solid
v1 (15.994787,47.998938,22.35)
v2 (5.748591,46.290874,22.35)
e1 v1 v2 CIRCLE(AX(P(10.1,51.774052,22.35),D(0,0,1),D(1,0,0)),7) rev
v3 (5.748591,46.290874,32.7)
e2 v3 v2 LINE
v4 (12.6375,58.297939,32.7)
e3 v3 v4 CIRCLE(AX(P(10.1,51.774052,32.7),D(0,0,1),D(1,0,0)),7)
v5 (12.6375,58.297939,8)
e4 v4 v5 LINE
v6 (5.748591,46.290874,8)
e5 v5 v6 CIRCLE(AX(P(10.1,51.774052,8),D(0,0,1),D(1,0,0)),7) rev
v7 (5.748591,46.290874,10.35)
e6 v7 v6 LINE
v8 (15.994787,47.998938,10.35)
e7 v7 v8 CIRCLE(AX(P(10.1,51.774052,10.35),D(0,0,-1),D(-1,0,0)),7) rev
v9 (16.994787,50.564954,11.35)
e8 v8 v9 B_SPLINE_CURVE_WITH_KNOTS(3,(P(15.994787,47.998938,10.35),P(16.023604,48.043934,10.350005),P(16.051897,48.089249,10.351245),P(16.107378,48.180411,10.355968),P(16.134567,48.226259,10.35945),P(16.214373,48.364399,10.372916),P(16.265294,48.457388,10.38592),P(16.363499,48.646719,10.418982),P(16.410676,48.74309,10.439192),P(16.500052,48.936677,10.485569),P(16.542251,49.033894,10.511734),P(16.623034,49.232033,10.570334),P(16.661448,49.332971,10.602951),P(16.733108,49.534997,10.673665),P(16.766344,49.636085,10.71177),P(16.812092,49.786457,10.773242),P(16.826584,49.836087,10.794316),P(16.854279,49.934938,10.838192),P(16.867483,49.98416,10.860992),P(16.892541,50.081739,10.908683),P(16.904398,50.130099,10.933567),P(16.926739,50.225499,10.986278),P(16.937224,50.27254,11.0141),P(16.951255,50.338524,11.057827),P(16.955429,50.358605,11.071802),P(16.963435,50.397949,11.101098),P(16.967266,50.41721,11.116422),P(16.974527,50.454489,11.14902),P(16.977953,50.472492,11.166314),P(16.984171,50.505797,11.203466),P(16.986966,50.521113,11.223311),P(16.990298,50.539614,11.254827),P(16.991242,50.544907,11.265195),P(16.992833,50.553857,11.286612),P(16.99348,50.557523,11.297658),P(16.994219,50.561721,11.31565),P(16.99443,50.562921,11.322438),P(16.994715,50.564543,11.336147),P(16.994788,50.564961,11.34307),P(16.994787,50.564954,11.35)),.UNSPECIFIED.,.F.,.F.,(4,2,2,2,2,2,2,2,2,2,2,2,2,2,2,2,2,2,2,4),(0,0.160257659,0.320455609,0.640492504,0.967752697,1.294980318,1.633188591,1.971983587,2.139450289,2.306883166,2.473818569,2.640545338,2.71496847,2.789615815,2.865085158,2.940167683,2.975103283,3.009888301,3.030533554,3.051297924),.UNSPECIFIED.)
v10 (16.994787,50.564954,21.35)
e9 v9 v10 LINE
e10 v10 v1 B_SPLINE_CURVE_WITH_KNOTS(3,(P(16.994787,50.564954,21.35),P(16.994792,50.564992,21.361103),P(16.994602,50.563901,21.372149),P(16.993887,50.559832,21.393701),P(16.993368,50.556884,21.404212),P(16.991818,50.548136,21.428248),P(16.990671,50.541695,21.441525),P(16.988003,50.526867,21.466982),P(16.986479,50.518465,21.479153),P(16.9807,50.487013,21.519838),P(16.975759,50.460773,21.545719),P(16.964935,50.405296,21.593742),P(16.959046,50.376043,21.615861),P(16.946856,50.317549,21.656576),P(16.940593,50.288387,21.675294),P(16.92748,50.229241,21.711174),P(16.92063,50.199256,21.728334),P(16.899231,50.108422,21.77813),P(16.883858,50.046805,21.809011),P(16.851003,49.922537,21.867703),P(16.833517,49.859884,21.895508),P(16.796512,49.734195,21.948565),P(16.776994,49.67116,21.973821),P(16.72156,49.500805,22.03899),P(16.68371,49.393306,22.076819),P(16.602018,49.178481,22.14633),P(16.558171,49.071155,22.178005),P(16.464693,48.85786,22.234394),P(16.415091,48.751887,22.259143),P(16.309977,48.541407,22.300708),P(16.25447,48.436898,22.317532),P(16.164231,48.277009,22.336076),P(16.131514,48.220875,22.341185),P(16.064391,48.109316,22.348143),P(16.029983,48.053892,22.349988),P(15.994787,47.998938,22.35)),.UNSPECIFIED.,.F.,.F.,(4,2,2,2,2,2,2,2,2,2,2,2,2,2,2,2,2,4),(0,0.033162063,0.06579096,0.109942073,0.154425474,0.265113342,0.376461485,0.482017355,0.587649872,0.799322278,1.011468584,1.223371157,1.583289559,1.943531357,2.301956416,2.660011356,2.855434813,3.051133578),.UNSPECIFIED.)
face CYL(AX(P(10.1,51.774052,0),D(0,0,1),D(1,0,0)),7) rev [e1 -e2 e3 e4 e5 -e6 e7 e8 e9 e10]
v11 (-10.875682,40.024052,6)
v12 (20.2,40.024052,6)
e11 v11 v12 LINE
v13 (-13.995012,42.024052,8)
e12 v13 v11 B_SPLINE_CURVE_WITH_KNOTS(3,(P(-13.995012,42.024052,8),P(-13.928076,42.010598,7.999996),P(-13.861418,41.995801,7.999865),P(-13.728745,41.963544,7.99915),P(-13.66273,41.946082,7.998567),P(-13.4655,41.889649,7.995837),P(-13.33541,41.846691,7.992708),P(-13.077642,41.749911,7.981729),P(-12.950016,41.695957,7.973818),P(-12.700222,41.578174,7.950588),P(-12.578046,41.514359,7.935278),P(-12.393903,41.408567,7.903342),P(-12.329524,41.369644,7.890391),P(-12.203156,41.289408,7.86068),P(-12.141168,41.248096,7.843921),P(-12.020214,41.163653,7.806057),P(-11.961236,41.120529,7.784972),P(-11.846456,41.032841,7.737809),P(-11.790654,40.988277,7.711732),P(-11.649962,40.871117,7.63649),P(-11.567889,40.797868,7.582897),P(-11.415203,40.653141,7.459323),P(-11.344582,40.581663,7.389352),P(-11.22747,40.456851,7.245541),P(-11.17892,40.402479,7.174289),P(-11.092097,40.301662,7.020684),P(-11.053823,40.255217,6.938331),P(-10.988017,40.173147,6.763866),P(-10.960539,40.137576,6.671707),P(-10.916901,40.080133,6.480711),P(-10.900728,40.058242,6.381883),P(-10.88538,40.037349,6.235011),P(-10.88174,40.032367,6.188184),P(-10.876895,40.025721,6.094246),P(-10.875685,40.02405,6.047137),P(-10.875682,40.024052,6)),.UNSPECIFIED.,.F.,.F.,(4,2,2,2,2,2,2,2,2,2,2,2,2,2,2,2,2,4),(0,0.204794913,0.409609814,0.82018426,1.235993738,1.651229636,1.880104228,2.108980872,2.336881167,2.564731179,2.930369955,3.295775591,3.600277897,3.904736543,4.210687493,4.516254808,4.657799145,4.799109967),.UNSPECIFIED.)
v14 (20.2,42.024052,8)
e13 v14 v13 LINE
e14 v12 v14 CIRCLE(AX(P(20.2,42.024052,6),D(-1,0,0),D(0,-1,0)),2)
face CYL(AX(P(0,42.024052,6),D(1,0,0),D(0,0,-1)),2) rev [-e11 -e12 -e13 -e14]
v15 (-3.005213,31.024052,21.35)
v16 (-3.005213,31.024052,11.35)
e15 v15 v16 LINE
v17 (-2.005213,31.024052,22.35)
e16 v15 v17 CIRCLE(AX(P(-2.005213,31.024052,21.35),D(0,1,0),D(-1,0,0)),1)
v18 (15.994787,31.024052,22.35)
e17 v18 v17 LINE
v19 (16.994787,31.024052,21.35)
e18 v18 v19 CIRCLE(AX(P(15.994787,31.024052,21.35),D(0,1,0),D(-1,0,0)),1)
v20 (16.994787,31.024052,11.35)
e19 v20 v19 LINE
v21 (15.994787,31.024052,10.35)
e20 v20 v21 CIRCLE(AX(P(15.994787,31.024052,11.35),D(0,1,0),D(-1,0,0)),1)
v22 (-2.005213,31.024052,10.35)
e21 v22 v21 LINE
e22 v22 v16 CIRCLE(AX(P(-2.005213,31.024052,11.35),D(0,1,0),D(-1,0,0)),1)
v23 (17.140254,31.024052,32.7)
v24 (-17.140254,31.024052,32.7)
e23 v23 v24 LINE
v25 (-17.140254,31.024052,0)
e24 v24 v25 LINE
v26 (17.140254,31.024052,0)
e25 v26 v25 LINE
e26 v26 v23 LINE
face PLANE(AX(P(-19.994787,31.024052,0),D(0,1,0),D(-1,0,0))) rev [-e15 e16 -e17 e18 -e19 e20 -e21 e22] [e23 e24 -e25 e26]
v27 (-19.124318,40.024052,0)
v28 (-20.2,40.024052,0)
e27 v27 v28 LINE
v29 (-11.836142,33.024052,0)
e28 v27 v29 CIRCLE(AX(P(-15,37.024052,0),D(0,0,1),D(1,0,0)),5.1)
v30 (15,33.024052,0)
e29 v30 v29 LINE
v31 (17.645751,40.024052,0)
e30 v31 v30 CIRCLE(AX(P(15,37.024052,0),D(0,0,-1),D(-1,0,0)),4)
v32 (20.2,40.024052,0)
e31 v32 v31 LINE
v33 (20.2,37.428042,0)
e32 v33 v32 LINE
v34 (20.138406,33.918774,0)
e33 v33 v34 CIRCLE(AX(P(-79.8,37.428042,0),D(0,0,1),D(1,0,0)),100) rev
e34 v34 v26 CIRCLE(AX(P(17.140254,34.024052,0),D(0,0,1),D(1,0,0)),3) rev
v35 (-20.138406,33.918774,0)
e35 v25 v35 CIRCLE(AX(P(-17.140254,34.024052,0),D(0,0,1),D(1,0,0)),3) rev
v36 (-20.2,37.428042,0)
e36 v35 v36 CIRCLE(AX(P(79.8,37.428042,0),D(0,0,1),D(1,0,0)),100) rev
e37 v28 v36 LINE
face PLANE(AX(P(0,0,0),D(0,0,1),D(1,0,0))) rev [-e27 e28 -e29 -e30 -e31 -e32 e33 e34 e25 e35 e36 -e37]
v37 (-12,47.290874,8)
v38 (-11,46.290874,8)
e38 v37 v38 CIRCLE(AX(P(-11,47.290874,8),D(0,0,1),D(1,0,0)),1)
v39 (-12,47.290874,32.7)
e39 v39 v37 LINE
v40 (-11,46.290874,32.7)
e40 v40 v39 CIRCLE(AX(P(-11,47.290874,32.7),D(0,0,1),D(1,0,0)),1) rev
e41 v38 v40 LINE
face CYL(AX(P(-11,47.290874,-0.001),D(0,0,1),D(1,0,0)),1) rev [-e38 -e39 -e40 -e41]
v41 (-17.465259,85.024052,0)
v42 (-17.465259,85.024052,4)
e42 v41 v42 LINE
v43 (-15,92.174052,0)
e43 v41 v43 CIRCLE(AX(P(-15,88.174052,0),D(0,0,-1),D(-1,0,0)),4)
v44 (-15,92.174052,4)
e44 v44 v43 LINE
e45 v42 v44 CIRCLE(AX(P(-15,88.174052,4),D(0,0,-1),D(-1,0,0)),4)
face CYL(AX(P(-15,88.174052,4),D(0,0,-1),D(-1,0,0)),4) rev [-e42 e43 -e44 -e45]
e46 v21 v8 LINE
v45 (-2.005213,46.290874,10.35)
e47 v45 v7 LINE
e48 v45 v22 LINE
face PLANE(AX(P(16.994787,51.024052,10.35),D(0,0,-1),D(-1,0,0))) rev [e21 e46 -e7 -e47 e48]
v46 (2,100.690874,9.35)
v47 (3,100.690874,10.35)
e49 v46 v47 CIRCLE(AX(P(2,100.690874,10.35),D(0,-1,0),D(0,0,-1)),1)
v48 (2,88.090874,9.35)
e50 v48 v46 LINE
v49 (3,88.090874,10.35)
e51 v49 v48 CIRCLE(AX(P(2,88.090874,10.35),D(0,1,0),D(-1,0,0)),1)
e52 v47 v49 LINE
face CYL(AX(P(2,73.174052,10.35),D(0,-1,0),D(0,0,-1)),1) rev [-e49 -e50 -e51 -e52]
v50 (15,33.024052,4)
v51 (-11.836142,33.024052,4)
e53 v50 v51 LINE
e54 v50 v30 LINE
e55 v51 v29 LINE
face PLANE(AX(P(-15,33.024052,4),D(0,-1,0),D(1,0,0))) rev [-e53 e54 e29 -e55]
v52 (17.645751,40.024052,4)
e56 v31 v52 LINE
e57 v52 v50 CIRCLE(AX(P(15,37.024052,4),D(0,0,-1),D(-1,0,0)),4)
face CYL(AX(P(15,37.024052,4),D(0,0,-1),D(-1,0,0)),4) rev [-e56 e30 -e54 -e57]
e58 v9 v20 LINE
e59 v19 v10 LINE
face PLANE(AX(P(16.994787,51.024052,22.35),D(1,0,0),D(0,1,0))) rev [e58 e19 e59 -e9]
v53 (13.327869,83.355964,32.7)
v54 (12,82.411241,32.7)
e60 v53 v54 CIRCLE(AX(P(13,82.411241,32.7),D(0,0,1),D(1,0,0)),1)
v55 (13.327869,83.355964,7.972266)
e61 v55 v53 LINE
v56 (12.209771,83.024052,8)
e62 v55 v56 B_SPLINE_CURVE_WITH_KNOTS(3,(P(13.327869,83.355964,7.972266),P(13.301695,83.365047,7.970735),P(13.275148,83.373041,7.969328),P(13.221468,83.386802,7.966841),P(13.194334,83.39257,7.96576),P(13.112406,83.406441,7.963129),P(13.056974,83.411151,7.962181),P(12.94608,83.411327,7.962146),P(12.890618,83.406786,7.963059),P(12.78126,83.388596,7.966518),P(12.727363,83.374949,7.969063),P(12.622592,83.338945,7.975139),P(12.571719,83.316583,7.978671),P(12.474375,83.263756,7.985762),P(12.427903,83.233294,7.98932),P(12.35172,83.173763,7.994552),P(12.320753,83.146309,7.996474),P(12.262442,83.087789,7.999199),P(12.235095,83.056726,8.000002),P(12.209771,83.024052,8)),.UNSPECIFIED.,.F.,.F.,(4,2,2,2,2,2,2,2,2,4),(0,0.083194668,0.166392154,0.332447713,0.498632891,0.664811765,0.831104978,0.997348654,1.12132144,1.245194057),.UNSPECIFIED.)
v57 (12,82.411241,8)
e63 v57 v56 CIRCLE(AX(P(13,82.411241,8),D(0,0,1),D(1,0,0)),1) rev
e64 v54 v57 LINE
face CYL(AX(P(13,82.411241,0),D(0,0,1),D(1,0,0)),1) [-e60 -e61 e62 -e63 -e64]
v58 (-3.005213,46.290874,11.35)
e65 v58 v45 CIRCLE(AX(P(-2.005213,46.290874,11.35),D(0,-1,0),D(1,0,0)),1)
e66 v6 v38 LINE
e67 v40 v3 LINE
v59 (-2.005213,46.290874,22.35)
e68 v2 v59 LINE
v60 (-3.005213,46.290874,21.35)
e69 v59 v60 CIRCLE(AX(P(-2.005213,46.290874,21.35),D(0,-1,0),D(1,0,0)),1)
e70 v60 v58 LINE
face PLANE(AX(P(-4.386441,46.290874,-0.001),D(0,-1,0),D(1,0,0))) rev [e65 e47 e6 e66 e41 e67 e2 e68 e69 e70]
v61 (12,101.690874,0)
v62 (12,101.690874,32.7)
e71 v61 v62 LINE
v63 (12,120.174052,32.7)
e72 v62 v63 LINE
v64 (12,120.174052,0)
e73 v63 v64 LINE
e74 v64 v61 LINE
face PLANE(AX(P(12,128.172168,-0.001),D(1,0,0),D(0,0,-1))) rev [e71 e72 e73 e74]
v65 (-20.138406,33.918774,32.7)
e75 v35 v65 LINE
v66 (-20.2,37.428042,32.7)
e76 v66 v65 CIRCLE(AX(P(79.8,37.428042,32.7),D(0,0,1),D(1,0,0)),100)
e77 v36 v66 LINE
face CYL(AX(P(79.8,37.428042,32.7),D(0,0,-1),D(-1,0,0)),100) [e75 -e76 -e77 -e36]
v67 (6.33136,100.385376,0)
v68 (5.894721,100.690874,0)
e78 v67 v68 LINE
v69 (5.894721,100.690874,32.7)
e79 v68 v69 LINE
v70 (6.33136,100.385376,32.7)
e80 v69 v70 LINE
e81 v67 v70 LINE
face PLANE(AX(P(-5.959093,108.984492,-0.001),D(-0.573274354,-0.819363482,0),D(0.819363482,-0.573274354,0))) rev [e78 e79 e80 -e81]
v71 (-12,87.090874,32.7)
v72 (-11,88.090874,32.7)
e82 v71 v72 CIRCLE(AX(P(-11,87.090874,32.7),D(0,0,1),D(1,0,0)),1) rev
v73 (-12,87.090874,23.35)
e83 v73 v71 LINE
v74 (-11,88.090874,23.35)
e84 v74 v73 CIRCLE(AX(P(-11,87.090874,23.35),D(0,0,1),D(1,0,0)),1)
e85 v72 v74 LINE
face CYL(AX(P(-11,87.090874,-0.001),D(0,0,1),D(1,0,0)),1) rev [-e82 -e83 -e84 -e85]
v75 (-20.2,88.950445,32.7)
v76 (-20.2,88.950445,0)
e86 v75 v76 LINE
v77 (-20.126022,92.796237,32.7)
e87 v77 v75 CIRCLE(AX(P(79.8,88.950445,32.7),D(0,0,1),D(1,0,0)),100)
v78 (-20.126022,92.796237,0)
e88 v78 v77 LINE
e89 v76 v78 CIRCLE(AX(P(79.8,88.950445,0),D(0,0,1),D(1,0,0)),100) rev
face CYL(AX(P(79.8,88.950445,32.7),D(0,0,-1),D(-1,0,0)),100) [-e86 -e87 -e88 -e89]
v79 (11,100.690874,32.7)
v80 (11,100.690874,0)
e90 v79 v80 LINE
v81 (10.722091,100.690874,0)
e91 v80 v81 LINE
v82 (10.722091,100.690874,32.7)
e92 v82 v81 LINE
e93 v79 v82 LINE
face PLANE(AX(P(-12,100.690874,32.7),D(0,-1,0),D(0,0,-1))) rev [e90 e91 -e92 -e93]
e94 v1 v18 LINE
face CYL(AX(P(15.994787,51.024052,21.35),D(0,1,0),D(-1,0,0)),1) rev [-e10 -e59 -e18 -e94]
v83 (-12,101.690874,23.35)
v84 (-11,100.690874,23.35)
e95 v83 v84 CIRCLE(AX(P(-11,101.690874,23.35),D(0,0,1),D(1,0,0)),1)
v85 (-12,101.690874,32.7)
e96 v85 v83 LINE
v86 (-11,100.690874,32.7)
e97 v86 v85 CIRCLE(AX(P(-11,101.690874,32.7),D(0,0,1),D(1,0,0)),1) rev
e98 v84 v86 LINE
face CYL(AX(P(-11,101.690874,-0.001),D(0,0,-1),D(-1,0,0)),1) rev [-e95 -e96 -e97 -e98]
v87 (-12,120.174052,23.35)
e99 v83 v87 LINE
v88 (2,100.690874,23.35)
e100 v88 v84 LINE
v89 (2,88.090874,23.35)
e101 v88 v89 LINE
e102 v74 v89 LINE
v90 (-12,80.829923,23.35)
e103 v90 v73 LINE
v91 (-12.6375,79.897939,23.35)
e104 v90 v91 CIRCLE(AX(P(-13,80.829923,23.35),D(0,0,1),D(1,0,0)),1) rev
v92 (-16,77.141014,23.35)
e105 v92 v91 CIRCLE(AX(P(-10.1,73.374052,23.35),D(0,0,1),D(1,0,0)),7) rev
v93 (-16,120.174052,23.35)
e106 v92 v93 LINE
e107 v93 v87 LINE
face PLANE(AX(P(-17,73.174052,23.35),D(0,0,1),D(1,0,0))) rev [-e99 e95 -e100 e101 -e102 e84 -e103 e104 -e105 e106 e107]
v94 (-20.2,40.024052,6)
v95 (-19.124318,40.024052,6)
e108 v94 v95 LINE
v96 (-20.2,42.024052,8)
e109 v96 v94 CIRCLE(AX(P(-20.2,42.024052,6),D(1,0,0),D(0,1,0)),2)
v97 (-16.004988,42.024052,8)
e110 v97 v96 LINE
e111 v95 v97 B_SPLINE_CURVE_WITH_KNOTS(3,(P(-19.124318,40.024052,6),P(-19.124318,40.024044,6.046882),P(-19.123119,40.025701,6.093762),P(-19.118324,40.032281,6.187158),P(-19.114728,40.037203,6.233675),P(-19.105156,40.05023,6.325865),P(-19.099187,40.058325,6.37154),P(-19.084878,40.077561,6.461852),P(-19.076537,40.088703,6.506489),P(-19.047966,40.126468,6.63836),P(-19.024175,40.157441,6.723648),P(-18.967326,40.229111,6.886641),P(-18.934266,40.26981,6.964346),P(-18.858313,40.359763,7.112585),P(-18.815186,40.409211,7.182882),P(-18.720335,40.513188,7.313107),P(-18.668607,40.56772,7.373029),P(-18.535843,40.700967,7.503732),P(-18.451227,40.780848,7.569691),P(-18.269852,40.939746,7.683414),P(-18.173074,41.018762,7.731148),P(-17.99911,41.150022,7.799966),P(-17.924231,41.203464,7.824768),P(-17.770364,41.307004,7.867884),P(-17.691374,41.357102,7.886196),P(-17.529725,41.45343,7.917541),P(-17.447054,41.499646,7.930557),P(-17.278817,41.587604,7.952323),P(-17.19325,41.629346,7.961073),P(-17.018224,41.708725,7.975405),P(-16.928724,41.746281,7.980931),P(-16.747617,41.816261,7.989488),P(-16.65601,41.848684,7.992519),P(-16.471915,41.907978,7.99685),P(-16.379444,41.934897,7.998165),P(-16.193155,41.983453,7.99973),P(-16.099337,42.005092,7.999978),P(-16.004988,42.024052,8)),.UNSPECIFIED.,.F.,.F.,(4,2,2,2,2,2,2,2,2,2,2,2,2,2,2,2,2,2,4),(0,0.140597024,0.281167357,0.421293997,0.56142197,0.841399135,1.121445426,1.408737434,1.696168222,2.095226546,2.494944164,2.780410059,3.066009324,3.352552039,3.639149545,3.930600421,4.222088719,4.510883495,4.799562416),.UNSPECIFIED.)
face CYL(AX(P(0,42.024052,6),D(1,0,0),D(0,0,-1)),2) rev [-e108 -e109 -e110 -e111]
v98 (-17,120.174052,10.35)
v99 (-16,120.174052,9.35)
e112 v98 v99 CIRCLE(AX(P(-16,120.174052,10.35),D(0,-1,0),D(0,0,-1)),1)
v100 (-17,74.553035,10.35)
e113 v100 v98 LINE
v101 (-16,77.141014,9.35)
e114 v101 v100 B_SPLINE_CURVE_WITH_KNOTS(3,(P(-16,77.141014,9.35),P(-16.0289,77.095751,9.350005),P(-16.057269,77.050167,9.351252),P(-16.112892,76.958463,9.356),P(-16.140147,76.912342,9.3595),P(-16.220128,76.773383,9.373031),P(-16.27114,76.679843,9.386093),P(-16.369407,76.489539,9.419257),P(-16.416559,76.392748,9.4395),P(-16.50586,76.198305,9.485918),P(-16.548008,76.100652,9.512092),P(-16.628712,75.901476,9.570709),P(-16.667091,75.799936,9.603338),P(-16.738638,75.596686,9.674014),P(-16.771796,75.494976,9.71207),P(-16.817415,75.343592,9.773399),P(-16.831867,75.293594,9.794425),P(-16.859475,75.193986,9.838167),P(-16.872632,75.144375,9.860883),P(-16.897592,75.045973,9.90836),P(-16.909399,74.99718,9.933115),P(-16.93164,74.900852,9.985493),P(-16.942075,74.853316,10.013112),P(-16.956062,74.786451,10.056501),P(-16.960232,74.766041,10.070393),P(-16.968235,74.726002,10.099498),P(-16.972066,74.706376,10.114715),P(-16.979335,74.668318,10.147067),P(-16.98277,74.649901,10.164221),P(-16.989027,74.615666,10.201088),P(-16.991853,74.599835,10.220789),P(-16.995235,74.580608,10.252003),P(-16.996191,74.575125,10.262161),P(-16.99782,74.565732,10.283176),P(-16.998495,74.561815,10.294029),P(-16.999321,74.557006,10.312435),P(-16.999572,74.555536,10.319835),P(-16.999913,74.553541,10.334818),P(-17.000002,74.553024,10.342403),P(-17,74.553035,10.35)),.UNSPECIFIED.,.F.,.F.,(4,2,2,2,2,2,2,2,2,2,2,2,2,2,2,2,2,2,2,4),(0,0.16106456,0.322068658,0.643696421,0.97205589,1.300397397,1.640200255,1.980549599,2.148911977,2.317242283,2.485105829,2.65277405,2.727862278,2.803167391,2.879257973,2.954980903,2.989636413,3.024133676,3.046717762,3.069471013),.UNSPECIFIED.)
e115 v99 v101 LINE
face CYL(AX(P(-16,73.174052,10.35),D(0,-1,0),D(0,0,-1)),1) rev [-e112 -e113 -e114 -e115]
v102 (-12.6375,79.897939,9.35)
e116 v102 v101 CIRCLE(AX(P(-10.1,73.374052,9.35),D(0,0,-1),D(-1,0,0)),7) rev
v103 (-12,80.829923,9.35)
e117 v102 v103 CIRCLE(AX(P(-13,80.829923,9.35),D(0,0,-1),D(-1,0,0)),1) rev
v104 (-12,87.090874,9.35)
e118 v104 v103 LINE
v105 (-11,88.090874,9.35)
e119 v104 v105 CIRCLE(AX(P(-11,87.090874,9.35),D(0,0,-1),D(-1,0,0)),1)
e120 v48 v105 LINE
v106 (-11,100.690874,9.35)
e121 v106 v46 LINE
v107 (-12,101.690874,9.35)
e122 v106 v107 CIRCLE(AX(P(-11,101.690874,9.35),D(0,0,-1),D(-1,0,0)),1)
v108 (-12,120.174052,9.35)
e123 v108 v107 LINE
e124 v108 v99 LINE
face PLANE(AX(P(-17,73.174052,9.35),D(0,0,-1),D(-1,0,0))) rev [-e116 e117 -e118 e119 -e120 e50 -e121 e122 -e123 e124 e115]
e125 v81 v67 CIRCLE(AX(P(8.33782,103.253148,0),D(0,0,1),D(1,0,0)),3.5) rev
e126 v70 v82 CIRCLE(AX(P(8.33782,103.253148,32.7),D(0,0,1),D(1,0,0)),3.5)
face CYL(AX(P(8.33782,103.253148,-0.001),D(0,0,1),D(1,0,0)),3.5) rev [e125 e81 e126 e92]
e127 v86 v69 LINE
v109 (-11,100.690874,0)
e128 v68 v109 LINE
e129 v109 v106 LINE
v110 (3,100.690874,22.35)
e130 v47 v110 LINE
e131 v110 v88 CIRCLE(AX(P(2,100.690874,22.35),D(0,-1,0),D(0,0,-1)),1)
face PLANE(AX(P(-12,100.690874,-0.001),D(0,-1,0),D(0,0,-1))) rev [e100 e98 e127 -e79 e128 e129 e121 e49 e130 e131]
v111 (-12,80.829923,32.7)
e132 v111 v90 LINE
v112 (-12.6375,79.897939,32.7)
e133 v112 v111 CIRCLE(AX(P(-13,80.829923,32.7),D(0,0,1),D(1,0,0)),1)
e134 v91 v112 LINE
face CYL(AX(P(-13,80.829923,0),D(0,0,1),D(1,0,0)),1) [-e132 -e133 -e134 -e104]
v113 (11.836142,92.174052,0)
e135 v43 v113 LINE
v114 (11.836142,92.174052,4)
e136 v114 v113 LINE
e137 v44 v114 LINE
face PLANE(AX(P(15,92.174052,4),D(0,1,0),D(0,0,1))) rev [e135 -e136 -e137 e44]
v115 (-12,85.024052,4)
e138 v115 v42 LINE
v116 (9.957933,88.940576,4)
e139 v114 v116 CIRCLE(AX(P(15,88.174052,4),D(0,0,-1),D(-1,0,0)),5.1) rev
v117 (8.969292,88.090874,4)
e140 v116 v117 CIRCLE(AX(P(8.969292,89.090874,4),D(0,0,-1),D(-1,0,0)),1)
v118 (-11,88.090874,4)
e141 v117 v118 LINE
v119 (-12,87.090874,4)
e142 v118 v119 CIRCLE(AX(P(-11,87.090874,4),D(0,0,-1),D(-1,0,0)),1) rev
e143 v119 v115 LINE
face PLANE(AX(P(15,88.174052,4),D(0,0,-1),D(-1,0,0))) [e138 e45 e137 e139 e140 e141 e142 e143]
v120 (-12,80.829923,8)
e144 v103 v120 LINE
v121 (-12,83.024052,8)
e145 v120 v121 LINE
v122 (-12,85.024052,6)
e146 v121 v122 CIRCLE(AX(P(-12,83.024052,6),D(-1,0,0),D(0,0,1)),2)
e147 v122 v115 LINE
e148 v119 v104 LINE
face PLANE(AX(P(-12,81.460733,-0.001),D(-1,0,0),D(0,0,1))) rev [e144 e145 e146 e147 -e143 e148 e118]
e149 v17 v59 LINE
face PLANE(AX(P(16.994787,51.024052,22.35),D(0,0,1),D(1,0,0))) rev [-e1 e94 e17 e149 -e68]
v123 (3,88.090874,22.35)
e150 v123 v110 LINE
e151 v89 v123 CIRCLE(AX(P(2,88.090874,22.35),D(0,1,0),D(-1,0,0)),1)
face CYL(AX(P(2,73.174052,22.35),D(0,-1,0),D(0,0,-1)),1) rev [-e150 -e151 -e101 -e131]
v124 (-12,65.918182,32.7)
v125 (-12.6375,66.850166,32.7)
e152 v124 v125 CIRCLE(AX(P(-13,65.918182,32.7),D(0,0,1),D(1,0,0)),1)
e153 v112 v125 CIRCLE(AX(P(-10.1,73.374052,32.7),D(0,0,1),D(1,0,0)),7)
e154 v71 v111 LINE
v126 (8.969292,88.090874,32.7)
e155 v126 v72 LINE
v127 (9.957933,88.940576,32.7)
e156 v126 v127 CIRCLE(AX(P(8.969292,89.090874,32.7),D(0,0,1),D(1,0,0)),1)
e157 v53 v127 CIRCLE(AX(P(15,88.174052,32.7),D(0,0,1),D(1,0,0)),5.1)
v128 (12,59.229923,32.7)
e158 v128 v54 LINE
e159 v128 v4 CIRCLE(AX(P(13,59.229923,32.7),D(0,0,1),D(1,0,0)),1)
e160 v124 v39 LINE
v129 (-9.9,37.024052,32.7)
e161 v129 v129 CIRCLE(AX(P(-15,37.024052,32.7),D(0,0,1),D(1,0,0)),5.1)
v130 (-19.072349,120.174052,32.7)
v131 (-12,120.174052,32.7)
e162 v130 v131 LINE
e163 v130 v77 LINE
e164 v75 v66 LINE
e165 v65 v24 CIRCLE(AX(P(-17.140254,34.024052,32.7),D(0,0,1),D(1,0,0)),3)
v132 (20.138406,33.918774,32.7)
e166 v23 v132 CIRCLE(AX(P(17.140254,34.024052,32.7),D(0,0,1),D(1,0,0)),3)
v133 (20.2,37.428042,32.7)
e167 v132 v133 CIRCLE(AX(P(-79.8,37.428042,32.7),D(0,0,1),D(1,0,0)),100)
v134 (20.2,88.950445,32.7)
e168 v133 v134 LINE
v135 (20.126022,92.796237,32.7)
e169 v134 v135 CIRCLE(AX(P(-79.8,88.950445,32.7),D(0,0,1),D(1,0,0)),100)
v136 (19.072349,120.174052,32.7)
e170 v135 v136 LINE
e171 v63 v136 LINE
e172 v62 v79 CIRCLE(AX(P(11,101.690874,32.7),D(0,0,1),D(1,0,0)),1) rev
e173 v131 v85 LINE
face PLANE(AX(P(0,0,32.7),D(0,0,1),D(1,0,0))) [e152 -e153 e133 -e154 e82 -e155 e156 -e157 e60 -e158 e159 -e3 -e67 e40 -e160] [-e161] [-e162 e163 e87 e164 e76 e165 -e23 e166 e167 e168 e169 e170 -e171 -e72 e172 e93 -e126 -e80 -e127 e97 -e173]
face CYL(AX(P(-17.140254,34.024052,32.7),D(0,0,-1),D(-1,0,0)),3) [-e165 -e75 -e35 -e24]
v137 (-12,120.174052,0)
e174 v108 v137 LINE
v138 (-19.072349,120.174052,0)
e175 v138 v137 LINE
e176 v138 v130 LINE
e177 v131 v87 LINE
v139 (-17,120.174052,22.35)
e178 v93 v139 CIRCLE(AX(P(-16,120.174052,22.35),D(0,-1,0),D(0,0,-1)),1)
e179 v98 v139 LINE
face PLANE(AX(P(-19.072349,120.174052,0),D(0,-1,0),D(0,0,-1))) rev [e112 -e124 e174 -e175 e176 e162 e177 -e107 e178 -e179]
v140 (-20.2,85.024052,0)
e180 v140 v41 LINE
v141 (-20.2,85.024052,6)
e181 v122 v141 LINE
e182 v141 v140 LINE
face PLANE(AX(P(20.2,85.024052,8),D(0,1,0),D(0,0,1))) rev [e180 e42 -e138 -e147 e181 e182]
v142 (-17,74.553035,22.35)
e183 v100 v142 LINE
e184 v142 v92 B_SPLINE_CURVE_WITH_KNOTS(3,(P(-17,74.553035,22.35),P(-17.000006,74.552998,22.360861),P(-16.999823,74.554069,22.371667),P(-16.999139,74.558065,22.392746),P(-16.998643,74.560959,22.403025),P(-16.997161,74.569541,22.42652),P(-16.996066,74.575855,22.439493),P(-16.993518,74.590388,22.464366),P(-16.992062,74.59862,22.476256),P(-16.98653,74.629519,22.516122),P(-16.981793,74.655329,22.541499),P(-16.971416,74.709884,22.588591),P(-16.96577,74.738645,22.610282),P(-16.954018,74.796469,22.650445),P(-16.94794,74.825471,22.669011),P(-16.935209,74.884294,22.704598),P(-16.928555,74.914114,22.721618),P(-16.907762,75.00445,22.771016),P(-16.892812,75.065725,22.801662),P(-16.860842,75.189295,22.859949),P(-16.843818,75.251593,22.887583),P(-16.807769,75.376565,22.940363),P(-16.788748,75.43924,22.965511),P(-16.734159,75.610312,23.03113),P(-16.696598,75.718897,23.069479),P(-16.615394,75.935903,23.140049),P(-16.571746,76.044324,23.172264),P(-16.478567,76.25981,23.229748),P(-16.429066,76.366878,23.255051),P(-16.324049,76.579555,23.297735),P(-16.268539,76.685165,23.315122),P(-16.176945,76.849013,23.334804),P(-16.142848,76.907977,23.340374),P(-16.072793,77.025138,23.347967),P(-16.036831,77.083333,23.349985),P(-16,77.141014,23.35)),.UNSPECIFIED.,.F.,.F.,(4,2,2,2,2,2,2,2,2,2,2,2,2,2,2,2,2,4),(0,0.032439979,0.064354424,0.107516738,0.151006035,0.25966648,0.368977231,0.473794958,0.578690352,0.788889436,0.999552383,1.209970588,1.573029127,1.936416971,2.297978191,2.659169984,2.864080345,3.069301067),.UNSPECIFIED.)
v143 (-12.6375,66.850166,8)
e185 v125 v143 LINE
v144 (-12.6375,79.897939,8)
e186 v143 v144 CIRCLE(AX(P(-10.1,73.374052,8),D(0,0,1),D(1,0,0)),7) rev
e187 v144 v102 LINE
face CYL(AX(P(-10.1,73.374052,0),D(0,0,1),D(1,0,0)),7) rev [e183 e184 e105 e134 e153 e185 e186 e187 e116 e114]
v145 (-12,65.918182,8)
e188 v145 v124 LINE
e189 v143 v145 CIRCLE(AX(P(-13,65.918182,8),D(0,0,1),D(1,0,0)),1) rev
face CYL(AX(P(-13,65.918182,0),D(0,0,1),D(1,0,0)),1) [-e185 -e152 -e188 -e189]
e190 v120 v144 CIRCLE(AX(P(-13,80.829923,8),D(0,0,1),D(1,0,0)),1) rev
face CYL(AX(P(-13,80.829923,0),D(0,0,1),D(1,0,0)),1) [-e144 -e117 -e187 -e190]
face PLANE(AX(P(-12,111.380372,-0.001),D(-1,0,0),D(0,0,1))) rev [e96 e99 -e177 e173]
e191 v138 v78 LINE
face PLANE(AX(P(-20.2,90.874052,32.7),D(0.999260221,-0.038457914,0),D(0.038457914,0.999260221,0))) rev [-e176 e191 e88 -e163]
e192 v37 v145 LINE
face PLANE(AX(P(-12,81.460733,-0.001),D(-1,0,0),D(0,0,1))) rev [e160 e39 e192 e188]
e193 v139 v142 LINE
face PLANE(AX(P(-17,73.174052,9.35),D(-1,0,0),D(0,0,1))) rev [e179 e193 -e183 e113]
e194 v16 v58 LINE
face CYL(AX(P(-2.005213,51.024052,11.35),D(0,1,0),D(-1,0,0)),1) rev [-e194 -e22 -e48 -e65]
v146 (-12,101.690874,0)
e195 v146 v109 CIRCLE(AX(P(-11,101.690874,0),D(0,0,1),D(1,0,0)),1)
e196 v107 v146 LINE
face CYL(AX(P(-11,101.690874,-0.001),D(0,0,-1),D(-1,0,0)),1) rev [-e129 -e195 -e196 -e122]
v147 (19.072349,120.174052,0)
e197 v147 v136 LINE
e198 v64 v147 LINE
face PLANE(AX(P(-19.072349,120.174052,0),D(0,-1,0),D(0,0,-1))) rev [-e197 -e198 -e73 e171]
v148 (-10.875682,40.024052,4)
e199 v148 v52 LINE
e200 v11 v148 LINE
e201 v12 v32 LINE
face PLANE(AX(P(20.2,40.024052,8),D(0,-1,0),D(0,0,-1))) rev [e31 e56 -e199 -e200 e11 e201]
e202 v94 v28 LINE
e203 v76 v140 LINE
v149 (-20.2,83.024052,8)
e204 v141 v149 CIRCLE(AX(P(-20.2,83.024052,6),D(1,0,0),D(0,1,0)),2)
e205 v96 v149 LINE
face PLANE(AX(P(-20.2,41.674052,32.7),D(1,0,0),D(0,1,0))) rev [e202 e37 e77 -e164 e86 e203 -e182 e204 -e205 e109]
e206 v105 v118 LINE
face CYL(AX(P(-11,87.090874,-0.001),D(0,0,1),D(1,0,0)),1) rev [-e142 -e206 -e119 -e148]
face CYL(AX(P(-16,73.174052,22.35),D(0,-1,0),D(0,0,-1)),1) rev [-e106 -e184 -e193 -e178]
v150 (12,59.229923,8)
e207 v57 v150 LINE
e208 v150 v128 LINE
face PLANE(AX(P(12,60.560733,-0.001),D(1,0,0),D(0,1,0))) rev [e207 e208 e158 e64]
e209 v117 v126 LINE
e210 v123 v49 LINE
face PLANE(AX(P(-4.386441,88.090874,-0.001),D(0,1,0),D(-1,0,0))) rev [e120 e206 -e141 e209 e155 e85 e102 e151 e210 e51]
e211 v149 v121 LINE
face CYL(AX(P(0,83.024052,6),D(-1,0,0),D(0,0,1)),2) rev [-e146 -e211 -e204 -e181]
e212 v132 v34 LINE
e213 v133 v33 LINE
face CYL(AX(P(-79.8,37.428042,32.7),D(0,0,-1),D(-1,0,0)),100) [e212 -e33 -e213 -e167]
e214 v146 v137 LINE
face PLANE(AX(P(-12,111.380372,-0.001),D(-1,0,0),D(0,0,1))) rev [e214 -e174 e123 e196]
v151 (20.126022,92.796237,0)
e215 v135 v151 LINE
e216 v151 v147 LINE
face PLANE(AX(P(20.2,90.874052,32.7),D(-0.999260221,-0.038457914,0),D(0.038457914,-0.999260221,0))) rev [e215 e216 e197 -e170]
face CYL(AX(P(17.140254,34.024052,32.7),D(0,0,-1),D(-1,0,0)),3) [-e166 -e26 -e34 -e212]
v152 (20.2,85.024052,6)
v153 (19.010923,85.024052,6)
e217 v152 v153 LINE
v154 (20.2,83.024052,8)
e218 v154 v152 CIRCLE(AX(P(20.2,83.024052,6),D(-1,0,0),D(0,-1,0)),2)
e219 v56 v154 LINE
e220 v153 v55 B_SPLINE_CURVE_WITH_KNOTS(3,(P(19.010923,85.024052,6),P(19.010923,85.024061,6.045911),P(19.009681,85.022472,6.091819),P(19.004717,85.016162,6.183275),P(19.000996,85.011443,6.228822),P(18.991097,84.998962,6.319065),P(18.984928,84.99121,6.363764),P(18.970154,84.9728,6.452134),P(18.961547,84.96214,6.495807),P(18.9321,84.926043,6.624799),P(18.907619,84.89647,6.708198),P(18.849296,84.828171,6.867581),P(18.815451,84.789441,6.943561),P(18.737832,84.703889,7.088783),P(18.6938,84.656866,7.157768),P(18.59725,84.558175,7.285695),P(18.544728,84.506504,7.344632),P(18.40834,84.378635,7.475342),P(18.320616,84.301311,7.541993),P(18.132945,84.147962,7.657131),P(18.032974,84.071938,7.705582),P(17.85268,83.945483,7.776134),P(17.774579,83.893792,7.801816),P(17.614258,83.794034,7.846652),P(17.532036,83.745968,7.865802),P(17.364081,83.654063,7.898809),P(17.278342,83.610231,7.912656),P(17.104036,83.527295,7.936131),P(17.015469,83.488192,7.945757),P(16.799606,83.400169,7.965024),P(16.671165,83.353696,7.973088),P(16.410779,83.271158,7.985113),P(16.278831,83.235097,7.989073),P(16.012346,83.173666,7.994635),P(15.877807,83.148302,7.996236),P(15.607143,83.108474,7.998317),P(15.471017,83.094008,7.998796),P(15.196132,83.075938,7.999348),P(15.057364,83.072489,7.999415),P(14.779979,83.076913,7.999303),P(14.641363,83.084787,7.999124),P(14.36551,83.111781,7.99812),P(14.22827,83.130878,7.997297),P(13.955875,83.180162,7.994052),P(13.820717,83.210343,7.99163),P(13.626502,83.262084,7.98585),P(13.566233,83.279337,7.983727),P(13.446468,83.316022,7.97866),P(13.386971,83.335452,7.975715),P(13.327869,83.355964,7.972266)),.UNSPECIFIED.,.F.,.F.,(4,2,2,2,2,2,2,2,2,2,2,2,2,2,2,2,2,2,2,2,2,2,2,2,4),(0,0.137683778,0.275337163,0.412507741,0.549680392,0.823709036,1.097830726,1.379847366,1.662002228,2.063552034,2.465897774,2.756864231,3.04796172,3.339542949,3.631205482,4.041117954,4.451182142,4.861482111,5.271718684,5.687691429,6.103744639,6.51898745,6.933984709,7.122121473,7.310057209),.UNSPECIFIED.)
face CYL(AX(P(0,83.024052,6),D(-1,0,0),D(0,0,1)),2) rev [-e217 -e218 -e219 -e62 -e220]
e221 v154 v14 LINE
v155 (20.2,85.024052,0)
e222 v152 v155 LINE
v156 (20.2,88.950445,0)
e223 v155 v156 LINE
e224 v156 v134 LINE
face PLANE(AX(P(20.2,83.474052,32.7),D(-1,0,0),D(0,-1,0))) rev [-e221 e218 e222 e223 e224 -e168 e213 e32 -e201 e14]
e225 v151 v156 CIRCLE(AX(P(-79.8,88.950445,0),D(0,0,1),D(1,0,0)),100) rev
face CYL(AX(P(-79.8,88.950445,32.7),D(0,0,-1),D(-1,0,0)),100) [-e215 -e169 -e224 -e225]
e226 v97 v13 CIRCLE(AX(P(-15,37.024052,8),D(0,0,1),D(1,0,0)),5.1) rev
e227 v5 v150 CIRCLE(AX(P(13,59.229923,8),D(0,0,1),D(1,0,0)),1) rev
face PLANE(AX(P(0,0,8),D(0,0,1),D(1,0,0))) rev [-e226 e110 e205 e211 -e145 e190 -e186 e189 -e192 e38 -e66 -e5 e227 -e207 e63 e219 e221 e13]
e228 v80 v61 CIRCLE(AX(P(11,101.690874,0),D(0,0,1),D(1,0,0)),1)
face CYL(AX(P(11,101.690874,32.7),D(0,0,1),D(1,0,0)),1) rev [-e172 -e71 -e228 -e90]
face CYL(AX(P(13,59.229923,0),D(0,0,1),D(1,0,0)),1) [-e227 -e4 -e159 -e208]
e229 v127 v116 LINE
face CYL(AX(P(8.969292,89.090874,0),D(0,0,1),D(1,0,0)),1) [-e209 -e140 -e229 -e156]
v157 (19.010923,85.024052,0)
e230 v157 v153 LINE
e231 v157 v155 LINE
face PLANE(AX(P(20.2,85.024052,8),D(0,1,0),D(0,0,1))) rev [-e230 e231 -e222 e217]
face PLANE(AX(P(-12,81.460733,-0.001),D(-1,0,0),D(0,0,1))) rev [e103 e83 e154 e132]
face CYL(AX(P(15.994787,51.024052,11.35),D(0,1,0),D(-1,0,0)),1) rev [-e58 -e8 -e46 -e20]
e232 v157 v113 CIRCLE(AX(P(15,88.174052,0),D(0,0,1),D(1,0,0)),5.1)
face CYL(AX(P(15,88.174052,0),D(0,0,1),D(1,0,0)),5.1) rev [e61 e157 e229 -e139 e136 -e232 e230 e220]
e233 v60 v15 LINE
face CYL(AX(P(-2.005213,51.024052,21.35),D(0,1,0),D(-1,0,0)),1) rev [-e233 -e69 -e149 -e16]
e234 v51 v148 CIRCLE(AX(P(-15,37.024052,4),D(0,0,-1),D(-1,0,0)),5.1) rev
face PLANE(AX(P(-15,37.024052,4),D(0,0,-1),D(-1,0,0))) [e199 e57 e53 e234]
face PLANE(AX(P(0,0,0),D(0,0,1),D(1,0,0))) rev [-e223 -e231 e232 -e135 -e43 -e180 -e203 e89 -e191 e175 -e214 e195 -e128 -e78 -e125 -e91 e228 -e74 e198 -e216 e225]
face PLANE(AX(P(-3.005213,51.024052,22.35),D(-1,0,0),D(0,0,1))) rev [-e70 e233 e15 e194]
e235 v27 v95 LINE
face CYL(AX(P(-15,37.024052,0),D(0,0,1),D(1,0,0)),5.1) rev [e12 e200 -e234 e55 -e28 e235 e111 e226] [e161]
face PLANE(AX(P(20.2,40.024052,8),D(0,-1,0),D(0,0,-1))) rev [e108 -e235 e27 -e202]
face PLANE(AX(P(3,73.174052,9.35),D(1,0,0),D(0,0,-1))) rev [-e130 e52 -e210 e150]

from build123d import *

# Parameters (mm, degrees)
SKETCH1_R               = 7.95
SKETCH1_R_2             = 3
MAIN_BODY_LINK_B1_DEPTH = 32.7
CUT_EXTRUDE2_REACH      = 172.091
CUT_EXTRUDE3_REACH      = 172.091
SKETCH5_R               = 1.5
PULLEYIDLERUP_DEPTH     = 32.7
CUT_EXTRUDE5_DEPTH      = 32.7
FILLET5_R               = 100
SKETCH8_R               = 15.25
CUT_EXTRUDE6_DEPTH      = 171.090551712
SKETCH9_R               = 5.1
SKETCH9_W               = 38.1446978
SKETCH9_H               = 45.516821784
SKETCH9_W_2             = 39.989573096
SKETCH9_H_2             = 49.024052381
CUT_EXTRUDE7_DEPTH      = 171.090551712
SKETCH10_W              = 24
SKETCH10_H              = 41.8
SKETCH10_H_2            = 19.483178216
CUT_EXTRUDE8_DEPTH      = 127.171046068
SKETCH12_R              = 7
CUT_EXTRUDE13_DEPTH     = 127.171046068
SKETCH16_W              = 40.4
SKETCH16_H              = 45
CUT_EXTRUDE18_DEPTH     = 8
SKETCH18_W              = 20
SKETCH18_H              = 14
CUT_EXTRUDE19_DEPTH     = 47
SKETCH19_W              = 20
SKETCH19_H              = 12
CUT_EXTRUDE20_DEPTH     = 20
CUT_EXTRUDE21_DEPTH     = 4
FILLET6_R               = 3
FILLET7_R               = 1
FILLET8_R               = 1
FILLET9_R               = 2


with BuildPart() as part:
    # Sketch1 → Main Body Link B1 (new body)
    with BuildSketch(Plane.XY):
        with BuildLine():
            Line((20.2, 41.674052381), (20.2, 83.474052381))
            Line((20.2, 83.474052381), (20.2, 90.874052381))
            Line((20.2, 90.874052381), (17.986683974, 148.383116621))
            ThreePointArc((17.986683974, 148.383116621), (0, 165.690874165), (-17.986683974, 148.383116621))
            Line((-17.986683974, 148.383116621), (-20.2, 90.874052381))
            Line((-20.2, 90.874052381), (-20.2, 83.474052381))
            Line((-20.2, 83.474052381), (-20.2, 41.674052381))
            Line((-20.2, 41.674052381), (-20.2, 34.274052381))
            Line((-20.2, 34.274052381), (-17.964224051, -1.134307826))
            ThreePointArc((-17.964224051, -1.134307826), (0, -18), (17.964224051, -1.134307826))
            Line((17.964224051, -1.134307826), (20.2, 34.274052381))
            Line((20.2, 34.274052381), (20.2, 41.674052381))
        make_face()
        Circle(SKETCH1_R, mode=Mode.SUBTRACT)
        with Locations((15, 88.174052381)):
            Circle(SKETCH1_R_2, mode=Mode.SUBTRACT)
        with Locations((-15, 37.024052381)):
            Circle(SKETCH1_R_2, mode=Mode.SUBTRACT)
        with Locations((0, 147.690874165)):
            Circle(SKETCH1_R, mode=Mode.SUBTRACT)
    extrude(amount=MAIN_BODY_LINK_B1_DEPTH)

    # Sketch4 → Cut-Extrude2 (cut, up to next)
    with BuildSketch(Plane.XY.offset(32.7), mode=Mode.PRIVATE) as cut_extrude2_sk1:
        with BuildLine():
            Line((-12, 134.2744663), (-12, 123.584968066))
            Line((-12, 123.584968066), (-2.929911079, 129.930929878))
            ThreePointArc((-2.929911079, 129.930929878), (-7.774454217, 131.456408925), (-12, 134.2744663))
        make_face()
    cut_extrude2_tool1 = extrude(cut_extrude2_sk1.sketch, amount=-CUT_EXTRUDE2_REACH, mode=Mode.PRIVATE) & part.part
    # Sketch4 → Cut-Extrude2 (cut, up to next)
    with BuildSketch(Plane.XY.offset(32.7), mode=Mode.PRIVATE) as cut_extrude2_sk2:
        Polygon((-12, 100.690874165), (3.278172542, 100.690874165), (-12, 111.380372399), align=None)
    cut_extrude2_tool2 = extrude(cut_extrude2_sk2.sketch, amount=-CUT_EXTRUDE2_REACH, mode=Mode.PRIVATE) & part.part
    # Sketch4 → Cut-Extrude2 (cut, up to next)
    with BuildSketch(Plane.XY.offset(32.7), mode=Mode.PRIVATE) as cut_extrude2_sk3:
        Polygon((12, 128.172168466), (12, 106.793171999), (-3.278172542, 117.482670232), align=None)
    cut_extrude2_tool3 = extrude(cut_extrude2_sk3.sketch, amount=-CUT_EXTRUDE2_REACH, mode=Mode.PRIVATE) & part.part
    # Sketch4 → Cut-Extrude2 (cut, up to next)
    with BuildSketch(Plane.XY.offset(32.7), mode=Mode.PRIVATE) as cut_extrude2_sk4:
        Polygon((-4.386441158, 88.090874165), (12, 88.090874165), (12, 73.82101499), align=None)
    cut_extrude2_tool4 = extrude(cut_extrude2_sk4.sketch, amount=-CUT_EXTRUDE2_REACH, mode=Mode.PRIVATE) & part.part
    # Sketch4 → Cut-Extrude2 (cut, up to next)
    with BuildSketch(Plane.XY.offset(32.7), mode=Mode.PRIVATE) as cut_extrude2_sk5:
        Polygon((-12, 81.46073334), (-12, 52.92101499), (4.386441158, 67.190874165), align=None)
    cut_extrude2_tool5 = extrude(cut_extrude2_sk5.sketch, amount=-CUT_EXTRUDE2_REACH, mode=Mode.PRIVATE) & part.part
    # Sketch4 → Cut-Extrude2 (cut, up to next)
    with BuildSketch(Plane.XY.offset(32.7), mode=Mode.PRIVATE) as cut_extrude2_sk6:
        Polygon((-4.386441158, 46.290874165), (12, 46.290874165), (12, 60.56073334), align=None)
    cut_extrude2_tool6 = extrude(cut_extrude2_sk6.sketch, amount=-CUT_EXTRUDE2_REACH, mode=Mode.PRIVATE) & part.part
    add(cut_extrude2_tool1.solids().sort_by_distance((-9.12997, 128.978342, 32.7))[0], mode=Mode.SUBTRACT)
    add(cut_extrude2_tool2.solids().sort_by_distance((-6.907276, 104.25404, 32.7))[0], mode=Mode.SUBTRACT)
    add(cut_extrude2_tool3.solids().sort_by_distance((6.907276, 117.48267, 32.7))[0], mode=Mode.SUBTRACT)
    add(cut_extrude2_tool4.solids().sort_by_distance((6.537853, 83.334254, 32.7))[0], mode=Mode.SUBTRACT)
    add(cut_extrude2_tool5.solids().sort_by_distance((-6.537853, 67.190874, 32.7))[0], mode=Mode.SUBTRACT)
    add(cut_extrude2_tool6.solids().sort_by_distance((6.537853, 51.047494, 32.7))[0], mode=Mode.SUBTRACT)

    # Sketch5 → Cut-Extrude3 (cut, up to next)
    with BuildSketch(Plane.XY.offset(32.7), mode=Mode.PRIVATE) as cut_extrude3_sk1:
        with Locations((11.5, 147.690874165)):
            Circle(SKETCH5_R)
    cut_extrude3_tool1 = extrude(cut_extrude3_sk1.sketch, amount=-CUT_EXTRUDE3_REACH, mode=Mode.PRIVATE) & part.part
    # Sketch5 → Cut-Extrude3 (cut, up to next)
    with BuildSketch(Plane.XY.offset(32.7), mode=Mode.PRIVATE) as cut_extrude3_sk2:
        with Locations((-11.5, 147.690874165)):
            Circle(SKETCH5_R)
    cut_extrude3_tool2 = extrude(cut_extrude3_sk2.sketch, amount=-CUT_EXTRUDE3_REACH, mode=Mode.PRIVATE) & part.part
    # Sketch5 → Cut-Extrude3 (cut, up to next)
    with BuildSketch(Plane.XY.offset(32.7), mode=Mode.PRIVATE) as cut_extrude3_sk3:
        with Locations((-11.5, 0)):
            Circle(SKETCH5_R)
    cut_extrude3_tool3 = extrude(cut_extrude3_sk3.sketch, amount=-CUT_EXTRUDE3_REACH, mode=Mode.PRIVATE) & part.part
    # Sketch5 → Cut-Extrude3 (cut, up to next)
    with BuildSketch(Plane.XY.offset(32.7), mode=Mode.PRIVATE) as cut_extrude3_sk4:
        with Locations((11.5, 0)):
            Circle(SKETCH5_R)
    cut_extrude3_tool4 = extrude(cut_extrude3_sk4.sketch, amount=-CUT_EXTRUDE3_REACH, mode=Mode.PRIVATE) & part.part
    add(cut_extrude3_tool1.solids().sort_by_distance((11.5, 147.690874, 32.7))[0], mode=Mode.SUBTRACT)
    add(cut_extrude3_tool2.solids().sort_by_distance((-11.5, 147.690874, 32.7))[0], mode=Mode.SUBTRACT)
    add(cut_extrude3_tool3.solids().sort_by_distance((-11.5, 0, 32.7))[0], mode=Mode.SUBTRACT)
    add(cut_extrude3_tool4.solids().sort_by_distance((11.5, 0, 32.7))[0], mode=Mode.SUBTRACT)

    # Sketch6 → PulleyIdlerUp (cut)
    with BuildSketch(Plane.XY.offset(32.7)):
        with BuildLine():
            Line((-5.959092644, 108.984491566), (6.331359583, 100.385376259))
            ThreePointArc((6.331359583, 100.385376259), (11.205592008, 101.246688207), (10.34428006, 106.120920631))
            Line((10.34428006, 106.120920631), (-1.946172167, 114.720035938))
            ThreePointArc((-1.946172167, 114.720035938), (-6.820404592, 113.85872399), (-5.959092644, 108.984491566))
        make_face()
    extrude(amount=-PULLEYIDLERUP_DEPTH, mode=Mode.SUBTRACT)

    # Sketch7 → Cut-Extrude5 (cut)
    with BuildSketch(Plane.XY.offset(32.7)):
        with BuildLine():
            Line((-11.837342059, 24.015885081), (0.449938606, 15.412238536))
            ThreePointArc((0.449938606, 15.412238536), (5.324488288, 16.271753164), (4.46497366, 21.146302846))
            Line((4.46497366, 21.146302846), (-7.822307004, 29.749949391))
            ThreePointArc((-7.822307004, 29.749949391), (-12.696856686, 28.890434763), (-11.837342059, 24.015885081))
        make_face()
    extrude(amount=-CUT_EXTRUDE5_DEPTH, mode=Mode.SUBTRACT)

    # Fillet5
    # the kernel refuses this fillet: 100 mm, written as the material it takes off along each edge
    with BuildSketch(Plane(origin=(-20.2, 34.274052381, -7.884973578), x_dir=(0, 1, 0), z_dir=(0, 0, 1))) as fillet5_piece_1:
        with BuildLine():
            CenterArc((FILLET5_R * 0.0315398943126, -FILLET5_R), FILLET5_R, 90, 3.613007947)
            Line((-FILLET5_R * 0.0314772071099, -FILLET5_R * 0.00198755271875), (0, 0))
            Line((0, 0), (FILLET5_R * 0.0315398943126, 0))
        make_face()
    extrude(amount=48.469947156, mode=Mode.SUBTRACT)
    with BuildSketch(Plane(origin=(-20.2, 90.874052381, -4.809018086), x_dir=(0.03845791424359976, 0.9992602207793684, 0), z_dir=(0, 0, 1))) as fillet5_piece_2:
        with BuildLine():
            CenterArc((FILLET5_R * 0.0192360723451, -FILLET5_R), FILLET5_R, 90, 2.204019698)
            Line((-FILLET5_R * 0.0192218418985, -FILLET5_R * 0.000739779220632), (0, 0))
            Line((0, 0), (FILLET5_R * 0.0192360723451, 0))
        make_face()
    extrude(amount=42.318036173, mode=Mode.SUBTRACT)
    with BuildSketch(Plane(origin=(20.2, 90.874052381, -4.809018086), x_dir=(-0.03845791424359111, 0.9992602207793686, 0), z_dir=(0, 0, 1))) as fillet5_piece_3:
        with BuildLine():
            CenterArc((FILLET5_R * 0.0192360723451, FILLET5_R), FILLET5_R, 267.795980302, 2.204019698)
            Line((-FILLET5_R * 0.0192218418985, FILLET5_R * 0.000739779220631), (0, 0))
            Line((0, 0), (FILLET5_R * 0.0192360723451, 0))
        make_face()
    extrude(amount=42.318036173, mode=Mode.SUBTRACT)
    with BuildSketch(Plane(origin=(20.2, 34.274052381, -7.884973578), x_dir=(0, 1, 0), z_dir=(0, 0, 1))) as fillet5_piece_4:
        with BuildLine():
            CenterArc((FILLET5_R * 0.0315398943126, FILLET5_R), FILLET5_R, 266.386992053, 3.613007947)
            Line((-FILLET5_R * 0.0314772071099, FILLET5_R * 0.00198755271875), (0, 0))
            Line((0, 0), (FILLET5_R * 0.0315398943126, 0))
        make_face()
    extrude(amount=48.469947156, mode=Mode.SUBTRACT)

    # Sketch8 → Cut-Extrude6 (cut, through all)
    with BuildSketch(Plane.XY.offset(32.7)):
        Circle(SKETCH8_R)
        with Locations((0, 147.690874165)):
            Circle(SKETCH8_R)
    extrude(amount=-CUT_EXTRUDE6_DEPTH, mode=Mode.SUBTRACT)

    # Sketch9 → Cut-Extrude7 (cut, through all)
    with BuildSketch(Plane.XY.offset(32.7)):
        with Locations((15, 88.174052381)):
            Circle(SKETCH9_R)
        with Locations((-15, 37.024052381)):
            Circle(SKETCH9_R)
        with Locations((0, 142.932463273)):
            Rectangle(SKETCH9_W, SKETCH9_H)
        with Locations((0, 6.512026191)):
            Rectangle(SKETCH9_W_2, SKETCH9_H_2)
    extrude(amount=-CUT_EXTRUDE7_DEPTH, mode=Mode.SUBTRACT)

    # Sketch10 → Cut-Extrude8 (cut, through all)
    with BuildSketch(Plane(origin=(0, 0, 0), x_dir=(-1, 0, 0), z_dir=(0, 0, -1))):
        with Locations((0, 67.190874165)):
            Rectangle(SKETCH10_W, SKETCH10_H)
        with Locations((0, 110.432463273)):
            Rectangle(SKETCH10_W, SKETCH10_H_2)
    extrude(amount=-CUT_EXTRUDE8_DEPTH, mode=Mode.SUBTRACT)

    # Sketch12 → Cut-Extrude13 (cut, through all)
    with BuildSketch(Plane.XY.offset(32.7)):
        with Locations((-10.1, 73.374052381)):
            Circle(SKETCH12_R)
        with Locations((10.1, 51.774052381)):
            Circle(SKETCH12_R)
    extrude(amount=-CUT_EXTRUDE13_DEPTH, mode=Mode.SUBTRACT)

    # Sketch16 → Cut-Extrude18 (cut)
    with BuildSketch(Plane(origin=(0, 0, 0), x_dir=(-1, 0, 0), z_dir=(0, 0, -1))):
        with Locations((0, 62.524052381)):
            Rectangle(SKETCH16_W, SKETCH16_H)
    extrude(amount=-CUT_EXTRUDE18_DEPTH, mode=Mode.SUBTRACT)

    # Sketch18 → Cut-Extrude19 (cut)
    with BuildSketch(Plane(origin=(0, 120.174052381, 0), x_dir=(1, 0, 0), z_dir=(0, 1, 0))):
        with Locations((-7, -16.35)):
            Rectangle(SKETCH18_W, SKETCH18_H)
    extrude(amount=-CUT_EXTRUDE19_DEPTH, mode=Mode.SUBTRACT)

    # Sketch19 → Cut-Extrude20 (cut)
    with BuildSketch(Plane.XZ.offset(-31.024052381)):
        with Locations((6.994786548, 16.35)):
            Rectangle(SKETCH19_W, SKETCH19_H)
    extrude(amount=-CUT_EXTRUDE20_DEPTH, mode=Mode.SUBTRACT)

    # Sketch20 → Cut-Extrude21 (cut)
    with BuildSketch(Plane(origin=(0, 0, 0), x_dir=(-1, 0, 0), z_dir=(0, 0, -1))):
        with BuildLine():
            Line((-15, 92.174052381), (15, 92.174052381))
            ThreePointArc((15, 92.174052381), (19, 88.174052381), (15, 84.174052381))
            Line((15, 84.174052381), (-15, 84.174052381))
            ThreePointArc((-15, 84.174052381), (-19, 88.174052381), (-15, 92.174052381))
        make_face()
        with BuildLine():
            Line((15, 33.024052381), (-15, 33.024052381))
            ThreePointArc((-15, 33.024052381), (-19, 37.024052381), (-15, 41.024052381))
            Line((-15, 41.024052381), (15, 41.024052381))
            ThreePointArc((15, 41.024052381), (19, 37.024052381), (15, 33.024052381))
        make_face()
    extrude(amount=-CUT_EXTRUDE21_DEPTH, mode=Mode.SUBTRACT)

    # Fillet6
    fillet6_edges = [part.edges().sort_by_distance(p)[0] for p in [
        (19.994786548, 31.024052381, 16.35),
        (-19.994786548, 31.024052381, 16.35),
    ]]
    fillet(fillet6_edges, radius=FILLET6_R)

    # Fillet7
    fillet7_edges = [part.edges().sort_by_distance(p)[0] for p in [
        (12, 84.049734256, 20.35),
        (-12, 46.290874165, 20.35),
        (-12, 88.090874165, 28.025),
        (12, 100.690874165, 16.35),
        (-12, 80.111262487, 28.025),
        (12, 58.511262487, 20.35),
        (-12, 66.636842276, 20.35),
        (-12, 80.111262487, 8.675),
        (-12, 88.090874165, 6.675),
        (-12, 100.690874165, 28.025),
        (9.900678341, 88.090874165, 18.35),
        (-12, 100.690874165, 4.675),
    ]]
    fillet(fillet7_edges, radius=FILLET7_R)

    # Fillet8
    fillet8_edges = [part.edges().sort_by_distance(p)[0] for p in [
        (3, 94.390874165, 9.35),
        (-17, 97.363543688, 23.35),
        (-17, 97.363543688, 9.35),
        (3, 94.390874165, 23.35),
        (-3.005213452, 38.657463273, 10.35),
        (16.994786548, 40.794503281, 22.35),
        (16.994786548, 40.794503281, 10.35),
        (-3.005213452, 38.657463273, 22.35),
    ]]
    fillet(fillet8_edges, radius=FILLET8_R)

    # Fillet9
    fillet9_edges = [part.edges().sort_by_distance(p)[0] for p in [
        (4.662159063, 40.024052381, 8),
        (-16.1, 85.024052381, 8),
        (19.605461294, 85.024052381, 8),
        (-19.662159063, 40.024052381, 8),
    ]]
    fillet(fillet9_edges, radius=FILLET9_R)


solid = part.part
